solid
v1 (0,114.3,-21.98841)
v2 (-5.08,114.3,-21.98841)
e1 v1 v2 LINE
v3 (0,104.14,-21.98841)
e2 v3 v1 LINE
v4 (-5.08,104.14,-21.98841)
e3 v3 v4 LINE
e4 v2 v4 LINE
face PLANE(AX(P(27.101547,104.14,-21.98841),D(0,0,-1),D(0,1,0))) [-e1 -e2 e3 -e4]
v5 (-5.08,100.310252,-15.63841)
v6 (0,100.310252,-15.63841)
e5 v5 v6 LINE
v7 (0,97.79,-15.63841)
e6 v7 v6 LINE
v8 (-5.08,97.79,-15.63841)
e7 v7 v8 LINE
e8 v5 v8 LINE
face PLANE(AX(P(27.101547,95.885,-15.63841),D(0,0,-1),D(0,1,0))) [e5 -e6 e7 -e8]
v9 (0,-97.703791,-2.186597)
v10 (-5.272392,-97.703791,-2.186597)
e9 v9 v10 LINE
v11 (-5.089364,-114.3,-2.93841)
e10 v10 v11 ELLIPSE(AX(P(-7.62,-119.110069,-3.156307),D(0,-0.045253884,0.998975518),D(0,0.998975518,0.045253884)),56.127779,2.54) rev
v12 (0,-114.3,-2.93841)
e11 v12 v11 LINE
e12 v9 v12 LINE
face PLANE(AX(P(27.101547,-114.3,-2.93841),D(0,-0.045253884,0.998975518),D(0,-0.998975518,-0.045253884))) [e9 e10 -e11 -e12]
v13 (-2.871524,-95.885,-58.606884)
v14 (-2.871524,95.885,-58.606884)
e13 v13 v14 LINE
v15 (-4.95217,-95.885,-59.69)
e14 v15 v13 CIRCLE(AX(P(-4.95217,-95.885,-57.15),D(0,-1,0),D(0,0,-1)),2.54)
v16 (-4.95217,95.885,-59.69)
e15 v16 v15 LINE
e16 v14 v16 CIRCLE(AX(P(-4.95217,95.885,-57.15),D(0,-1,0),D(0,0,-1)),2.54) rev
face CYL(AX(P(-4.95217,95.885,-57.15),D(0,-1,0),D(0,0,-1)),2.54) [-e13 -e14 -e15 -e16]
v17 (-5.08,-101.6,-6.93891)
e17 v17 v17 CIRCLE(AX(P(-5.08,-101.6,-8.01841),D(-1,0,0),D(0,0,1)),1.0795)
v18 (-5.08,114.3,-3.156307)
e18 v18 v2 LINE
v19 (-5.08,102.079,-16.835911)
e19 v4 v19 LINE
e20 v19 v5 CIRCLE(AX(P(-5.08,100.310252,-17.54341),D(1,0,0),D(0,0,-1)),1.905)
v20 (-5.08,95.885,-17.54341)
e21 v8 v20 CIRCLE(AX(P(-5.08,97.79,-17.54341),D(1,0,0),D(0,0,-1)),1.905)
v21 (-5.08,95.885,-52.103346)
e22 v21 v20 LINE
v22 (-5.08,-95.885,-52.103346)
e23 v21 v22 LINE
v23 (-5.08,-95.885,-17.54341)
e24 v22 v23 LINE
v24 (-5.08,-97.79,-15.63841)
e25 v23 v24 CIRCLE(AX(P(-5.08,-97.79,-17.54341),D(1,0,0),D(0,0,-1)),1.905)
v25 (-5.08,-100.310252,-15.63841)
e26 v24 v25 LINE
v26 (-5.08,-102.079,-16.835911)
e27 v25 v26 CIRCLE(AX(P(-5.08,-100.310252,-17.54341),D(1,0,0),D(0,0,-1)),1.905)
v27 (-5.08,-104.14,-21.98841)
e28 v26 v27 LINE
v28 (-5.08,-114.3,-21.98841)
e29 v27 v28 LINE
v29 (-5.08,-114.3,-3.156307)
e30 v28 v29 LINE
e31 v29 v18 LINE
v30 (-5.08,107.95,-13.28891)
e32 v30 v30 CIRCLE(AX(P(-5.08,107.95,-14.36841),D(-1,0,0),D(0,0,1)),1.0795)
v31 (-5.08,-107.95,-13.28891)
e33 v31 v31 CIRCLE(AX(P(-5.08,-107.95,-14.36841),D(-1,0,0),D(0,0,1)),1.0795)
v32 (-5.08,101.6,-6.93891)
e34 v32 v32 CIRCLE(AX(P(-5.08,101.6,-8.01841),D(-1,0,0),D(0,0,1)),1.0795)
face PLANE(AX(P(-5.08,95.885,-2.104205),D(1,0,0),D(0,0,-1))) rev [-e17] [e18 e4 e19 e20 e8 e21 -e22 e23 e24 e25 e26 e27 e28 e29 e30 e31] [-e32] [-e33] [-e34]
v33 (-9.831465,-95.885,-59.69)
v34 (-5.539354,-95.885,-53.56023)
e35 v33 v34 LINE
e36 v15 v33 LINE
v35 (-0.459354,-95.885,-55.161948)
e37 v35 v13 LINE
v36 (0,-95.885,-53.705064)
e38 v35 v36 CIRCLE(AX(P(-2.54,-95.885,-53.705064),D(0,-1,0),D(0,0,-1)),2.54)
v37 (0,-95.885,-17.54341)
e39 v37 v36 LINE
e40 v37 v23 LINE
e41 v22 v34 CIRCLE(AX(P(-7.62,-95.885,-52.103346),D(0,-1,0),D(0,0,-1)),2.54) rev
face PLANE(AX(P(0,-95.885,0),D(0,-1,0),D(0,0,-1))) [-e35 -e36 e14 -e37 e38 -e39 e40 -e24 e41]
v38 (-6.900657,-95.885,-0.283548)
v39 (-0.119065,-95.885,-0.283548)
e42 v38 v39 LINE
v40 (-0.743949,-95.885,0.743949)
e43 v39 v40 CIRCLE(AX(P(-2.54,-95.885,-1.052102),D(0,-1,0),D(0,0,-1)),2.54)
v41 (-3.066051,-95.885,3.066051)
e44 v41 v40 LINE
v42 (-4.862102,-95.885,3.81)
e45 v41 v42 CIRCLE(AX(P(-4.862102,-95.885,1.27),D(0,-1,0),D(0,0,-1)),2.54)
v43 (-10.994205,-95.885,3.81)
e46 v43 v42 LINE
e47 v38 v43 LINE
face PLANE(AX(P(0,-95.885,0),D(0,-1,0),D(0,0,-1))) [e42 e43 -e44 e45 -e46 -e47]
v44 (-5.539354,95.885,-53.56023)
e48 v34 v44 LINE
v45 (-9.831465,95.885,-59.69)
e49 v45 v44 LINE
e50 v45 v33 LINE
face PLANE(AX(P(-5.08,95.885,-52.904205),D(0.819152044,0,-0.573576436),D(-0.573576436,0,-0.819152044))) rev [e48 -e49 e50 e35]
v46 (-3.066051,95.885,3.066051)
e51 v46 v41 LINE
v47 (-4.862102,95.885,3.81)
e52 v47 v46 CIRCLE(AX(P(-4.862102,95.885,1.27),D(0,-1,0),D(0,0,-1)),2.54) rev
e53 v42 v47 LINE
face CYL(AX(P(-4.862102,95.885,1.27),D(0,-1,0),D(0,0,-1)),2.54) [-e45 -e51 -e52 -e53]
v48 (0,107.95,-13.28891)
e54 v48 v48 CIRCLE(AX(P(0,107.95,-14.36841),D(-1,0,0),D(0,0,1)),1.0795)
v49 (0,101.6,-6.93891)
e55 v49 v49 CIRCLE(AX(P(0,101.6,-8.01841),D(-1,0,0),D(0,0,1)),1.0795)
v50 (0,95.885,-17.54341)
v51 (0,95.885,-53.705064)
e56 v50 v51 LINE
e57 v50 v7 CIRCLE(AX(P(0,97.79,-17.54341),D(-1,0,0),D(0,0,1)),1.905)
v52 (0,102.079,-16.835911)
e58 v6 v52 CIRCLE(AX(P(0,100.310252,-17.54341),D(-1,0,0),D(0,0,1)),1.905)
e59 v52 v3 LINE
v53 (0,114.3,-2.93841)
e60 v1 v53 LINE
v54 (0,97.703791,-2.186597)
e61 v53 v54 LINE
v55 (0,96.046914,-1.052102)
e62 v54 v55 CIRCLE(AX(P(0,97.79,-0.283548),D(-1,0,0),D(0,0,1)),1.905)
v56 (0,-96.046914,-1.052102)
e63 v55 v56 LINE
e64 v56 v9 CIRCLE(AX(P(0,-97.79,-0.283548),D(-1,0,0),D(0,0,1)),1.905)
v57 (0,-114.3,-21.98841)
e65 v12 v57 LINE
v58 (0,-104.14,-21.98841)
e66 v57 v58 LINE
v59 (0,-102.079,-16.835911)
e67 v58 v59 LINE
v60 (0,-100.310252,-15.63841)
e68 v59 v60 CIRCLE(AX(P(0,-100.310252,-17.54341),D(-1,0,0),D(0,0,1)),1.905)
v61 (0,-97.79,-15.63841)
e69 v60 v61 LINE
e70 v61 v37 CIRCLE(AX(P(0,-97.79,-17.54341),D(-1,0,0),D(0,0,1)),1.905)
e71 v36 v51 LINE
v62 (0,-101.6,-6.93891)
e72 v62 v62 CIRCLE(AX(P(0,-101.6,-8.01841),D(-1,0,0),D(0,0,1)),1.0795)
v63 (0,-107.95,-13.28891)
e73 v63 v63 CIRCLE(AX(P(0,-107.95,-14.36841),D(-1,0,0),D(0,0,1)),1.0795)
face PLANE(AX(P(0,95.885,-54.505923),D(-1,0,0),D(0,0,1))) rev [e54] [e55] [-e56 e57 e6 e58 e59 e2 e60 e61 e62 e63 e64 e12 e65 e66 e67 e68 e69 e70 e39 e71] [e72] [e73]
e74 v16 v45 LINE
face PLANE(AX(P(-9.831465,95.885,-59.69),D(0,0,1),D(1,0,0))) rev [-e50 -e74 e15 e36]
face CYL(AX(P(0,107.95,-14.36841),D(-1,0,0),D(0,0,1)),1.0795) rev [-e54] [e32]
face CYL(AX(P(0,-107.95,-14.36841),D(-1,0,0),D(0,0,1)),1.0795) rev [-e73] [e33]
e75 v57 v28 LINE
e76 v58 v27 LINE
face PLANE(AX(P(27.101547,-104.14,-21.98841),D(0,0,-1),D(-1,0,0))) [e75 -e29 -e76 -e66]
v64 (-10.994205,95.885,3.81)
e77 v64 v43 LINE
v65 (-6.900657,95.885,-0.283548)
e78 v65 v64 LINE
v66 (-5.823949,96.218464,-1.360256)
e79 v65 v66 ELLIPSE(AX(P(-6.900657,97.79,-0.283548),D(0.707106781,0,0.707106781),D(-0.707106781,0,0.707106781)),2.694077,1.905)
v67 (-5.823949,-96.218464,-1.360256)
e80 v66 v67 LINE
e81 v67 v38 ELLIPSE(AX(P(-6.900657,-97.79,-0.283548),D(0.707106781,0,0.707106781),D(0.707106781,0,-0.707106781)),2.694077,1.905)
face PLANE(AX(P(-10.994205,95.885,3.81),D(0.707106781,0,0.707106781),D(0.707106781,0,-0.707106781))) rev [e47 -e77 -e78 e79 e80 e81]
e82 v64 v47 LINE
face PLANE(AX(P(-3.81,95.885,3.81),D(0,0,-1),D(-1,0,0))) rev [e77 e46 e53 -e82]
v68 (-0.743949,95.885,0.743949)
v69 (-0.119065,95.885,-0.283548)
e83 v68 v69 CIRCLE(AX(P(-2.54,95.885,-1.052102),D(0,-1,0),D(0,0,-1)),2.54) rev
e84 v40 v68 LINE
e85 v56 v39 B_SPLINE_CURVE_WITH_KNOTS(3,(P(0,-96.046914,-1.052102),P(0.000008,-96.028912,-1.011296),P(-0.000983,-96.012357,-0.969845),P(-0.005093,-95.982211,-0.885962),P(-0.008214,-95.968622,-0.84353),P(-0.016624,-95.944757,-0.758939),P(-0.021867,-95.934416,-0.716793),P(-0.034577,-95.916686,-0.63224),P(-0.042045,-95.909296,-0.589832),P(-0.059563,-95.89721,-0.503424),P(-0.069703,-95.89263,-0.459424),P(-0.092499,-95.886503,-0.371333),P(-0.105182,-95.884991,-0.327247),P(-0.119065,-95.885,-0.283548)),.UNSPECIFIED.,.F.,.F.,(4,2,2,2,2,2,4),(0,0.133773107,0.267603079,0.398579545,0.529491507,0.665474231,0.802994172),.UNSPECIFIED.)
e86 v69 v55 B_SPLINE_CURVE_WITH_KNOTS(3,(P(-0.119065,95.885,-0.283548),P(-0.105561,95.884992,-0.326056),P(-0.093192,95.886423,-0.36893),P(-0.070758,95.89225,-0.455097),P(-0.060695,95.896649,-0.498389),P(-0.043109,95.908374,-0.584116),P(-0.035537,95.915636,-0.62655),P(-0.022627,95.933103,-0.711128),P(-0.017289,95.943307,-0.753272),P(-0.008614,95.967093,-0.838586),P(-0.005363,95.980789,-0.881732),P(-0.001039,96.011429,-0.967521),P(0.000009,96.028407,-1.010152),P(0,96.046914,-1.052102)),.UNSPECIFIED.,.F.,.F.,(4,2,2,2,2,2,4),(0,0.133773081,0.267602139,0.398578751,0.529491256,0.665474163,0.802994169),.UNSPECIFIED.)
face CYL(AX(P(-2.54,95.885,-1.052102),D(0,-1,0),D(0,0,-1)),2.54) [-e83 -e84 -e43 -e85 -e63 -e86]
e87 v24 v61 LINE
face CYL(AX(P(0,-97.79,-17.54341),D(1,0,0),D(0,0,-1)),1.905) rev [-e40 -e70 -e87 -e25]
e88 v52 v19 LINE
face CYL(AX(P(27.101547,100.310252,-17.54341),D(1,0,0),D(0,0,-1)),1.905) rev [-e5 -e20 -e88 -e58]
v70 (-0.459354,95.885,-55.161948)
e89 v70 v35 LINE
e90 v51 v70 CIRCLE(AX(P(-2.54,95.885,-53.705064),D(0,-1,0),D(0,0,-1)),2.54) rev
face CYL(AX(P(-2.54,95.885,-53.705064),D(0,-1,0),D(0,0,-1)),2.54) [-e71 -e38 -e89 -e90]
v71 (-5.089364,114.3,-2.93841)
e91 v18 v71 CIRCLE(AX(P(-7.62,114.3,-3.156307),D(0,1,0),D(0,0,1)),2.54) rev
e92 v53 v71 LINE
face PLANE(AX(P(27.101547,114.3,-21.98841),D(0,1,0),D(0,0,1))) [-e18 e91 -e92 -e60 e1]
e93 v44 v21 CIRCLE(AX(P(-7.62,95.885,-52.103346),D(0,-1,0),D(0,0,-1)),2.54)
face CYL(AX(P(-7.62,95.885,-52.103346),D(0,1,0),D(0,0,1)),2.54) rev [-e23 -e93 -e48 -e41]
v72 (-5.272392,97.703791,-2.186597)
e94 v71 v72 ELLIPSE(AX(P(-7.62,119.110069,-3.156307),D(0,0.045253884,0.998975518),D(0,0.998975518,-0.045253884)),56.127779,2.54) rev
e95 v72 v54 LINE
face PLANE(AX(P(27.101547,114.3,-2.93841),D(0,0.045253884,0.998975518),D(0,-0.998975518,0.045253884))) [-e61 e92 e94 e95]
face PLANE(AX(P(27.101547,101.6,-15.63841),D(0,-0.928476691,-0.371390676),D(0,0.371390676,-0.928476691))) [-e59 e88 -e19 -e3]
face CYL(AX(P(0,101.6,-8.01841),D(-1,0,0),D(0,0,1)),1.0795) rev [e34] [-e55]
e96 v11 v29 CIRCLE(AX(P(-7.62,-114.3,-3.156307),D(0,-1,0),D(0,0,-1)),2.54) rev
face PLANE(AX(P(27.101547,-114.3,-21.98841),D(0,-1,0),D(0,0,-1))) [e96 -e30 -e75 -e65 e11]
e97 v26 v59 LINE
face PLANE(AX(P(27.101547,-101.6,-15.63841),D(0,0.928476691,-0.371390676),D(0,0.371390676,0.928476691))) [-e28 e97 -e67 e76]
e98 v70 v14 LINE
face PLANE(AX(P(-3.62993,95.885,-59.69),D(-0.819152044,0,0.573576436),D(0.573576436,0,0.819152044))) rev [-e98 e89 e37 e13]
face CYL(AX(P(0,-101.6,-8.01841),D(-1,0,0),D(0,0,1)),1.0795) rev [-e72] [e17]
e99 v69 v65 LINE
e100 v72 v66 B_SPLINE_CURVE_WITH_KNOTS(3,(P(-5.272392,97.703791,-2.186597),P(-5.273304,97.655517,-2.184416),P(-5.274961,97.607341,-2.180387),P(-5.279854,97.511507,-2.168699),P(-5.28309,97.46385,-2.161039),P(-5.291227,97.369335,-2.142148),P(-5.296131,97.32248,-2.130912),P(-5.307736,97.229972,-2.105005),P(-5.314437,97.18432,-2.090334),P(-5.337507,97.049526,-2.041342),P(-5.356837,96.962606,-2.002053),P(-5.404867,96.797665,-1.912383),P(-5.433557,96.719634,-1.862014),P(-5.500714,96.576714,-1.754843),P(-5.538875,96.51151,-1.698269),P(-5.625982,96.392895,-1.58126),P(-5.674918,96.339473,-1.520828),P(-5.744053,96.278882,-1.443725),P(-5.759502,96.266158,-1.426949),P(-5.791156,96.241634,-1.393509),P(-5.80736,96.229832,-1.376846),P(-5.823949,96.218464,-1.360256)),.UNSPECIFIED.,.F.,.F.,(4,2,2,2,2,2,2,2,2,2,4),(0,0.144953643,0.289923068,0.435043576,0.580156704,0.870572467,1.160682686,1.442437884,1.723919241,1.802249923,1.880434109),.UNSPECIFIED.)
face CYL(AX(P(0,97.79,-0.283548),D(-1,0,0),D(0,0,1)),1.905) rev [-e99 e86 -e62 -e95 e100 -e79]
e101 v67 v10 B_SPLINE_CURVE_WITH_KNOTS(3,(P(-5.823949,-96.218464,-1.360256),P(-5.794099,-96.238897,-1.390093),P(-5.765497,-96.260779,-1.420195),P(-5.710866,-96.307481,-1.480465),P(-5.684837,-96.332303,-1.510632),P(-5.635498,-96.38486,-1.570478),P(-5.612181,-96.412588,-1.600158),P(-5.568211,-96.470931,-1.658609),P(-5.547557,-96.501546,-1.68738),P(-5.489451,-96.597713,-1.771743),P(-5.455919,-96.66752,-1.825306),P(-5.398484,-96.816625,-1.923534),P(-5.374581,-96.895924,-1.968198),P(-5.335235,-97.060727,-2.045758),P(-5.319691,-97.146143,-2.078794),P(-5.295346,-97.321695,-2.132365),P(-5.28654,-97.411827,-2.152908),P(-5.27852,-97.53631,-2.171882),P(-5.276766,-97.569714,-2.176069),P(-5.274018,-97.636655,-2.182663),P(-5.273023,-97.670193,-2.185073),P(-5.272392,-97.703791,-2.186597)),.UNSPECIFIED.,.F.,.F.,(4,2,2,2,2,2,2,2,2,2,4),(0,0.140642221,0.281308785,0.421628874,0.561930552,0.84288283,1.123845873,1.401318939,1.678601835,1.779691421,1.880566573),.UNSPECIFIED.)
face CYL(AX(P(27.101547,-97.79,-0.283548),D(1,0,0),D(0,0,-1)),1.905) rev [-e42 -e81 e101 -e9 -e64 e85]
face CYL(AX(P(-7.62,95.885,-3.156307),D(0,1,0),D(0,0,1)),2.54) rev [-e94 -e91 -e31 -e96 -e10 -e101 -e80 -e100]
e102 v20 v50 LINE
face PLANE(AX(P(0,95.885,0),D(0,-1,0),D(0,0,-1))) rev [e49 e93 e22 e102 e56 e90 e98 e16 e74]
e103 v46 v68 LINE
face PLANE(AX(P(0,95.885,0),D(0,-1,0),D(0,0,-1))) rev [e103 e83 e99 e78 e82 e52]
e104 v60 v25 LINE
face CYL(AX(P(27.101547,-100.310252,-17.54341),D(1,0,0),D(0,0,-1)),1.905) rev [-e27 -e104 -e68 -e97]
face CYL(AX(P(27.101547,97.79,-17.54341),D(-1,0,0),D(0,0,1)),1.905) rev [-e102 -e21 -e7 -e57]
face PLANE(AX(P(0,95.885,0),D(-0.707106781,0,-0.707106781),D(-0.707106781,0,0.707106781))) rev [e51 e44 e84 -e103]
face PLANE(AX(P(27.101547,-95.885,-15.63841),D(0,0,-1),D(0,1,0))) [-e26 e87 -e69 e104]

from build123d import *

# Parameters (mm, degrees)
BOSS_EXTRUDE1_DEPTH = 95.885
BOSS_EXTRUDE2_DEPTH = 5.08
SKETCH5_R           = 1.0795
CUT_EXTRUDE1_DEPTH  = 130.08277933
FILLET2_R           = 1.905
FILLET3_R           = 2.54


with BuildPart() as part:
    # Sketch2 → Boss-Extrude1 (new, symmetric)
    with BuildSketch(Plane(origin=(0, 0, 0), x_dir=(1, 0, 0), z_dir=(0, 1, 0))):
        Polygon((0, 0), (-3.81, -3.81), (-10.994204897, -3.81), (-5.08, 2.104204897), (-5.08, 52.904204897), (-9.831464884, 59.69), (-3.629929973, 59.69), (0, 54.505922744), align=None)
    extrude(amount=BOSS_EXTRUDE1_DEPTH, both=True)

    # Sketch3 → Boss-Extrude2 (add)
    with BuildSketch(Plane.ZY.offset(5.08)):
        Polygon((-15.638409794, -95.885), (-15.638409794, -101.6), (-21.988409794, -104.14), (-21.988409794, -114.3), (-2.938409794, -114.3), (-2.104204897, -95.885), align=None)
        Polygon((-15.638409794, 95.885), (-2.104204897, 95.885), (-2.938409794, 114.3), (-21.988409794, 114.3), (-21.988409794, 104.14), (-15.638409794, 101.6), align=None)
    extrude(amount=-BOSS_EXTRUDE2_DEPTH)

    # Sketch5 → Cut-Extrude1 (cut, through all)
    with BuildSketch(Plane.ZY.offset(5.08)):
        with Locations((-40.64, -107.95)):
            Circle(SKETCH5_R)
        with Locations((-46.99, -101.6)):
            Circle(SKETCH5_R)
        with Locations((-46.99, 101.6)):
            Circle(SKETCH5_R)
        with Locations((-40.64, 107.95)):
            Circle(SKETCH5_R)
        with Locations((-8.018409794, -101.6)):
            Circle(SKETCH5_R)
        with Locations((-14.368409794, -107.95)):
            Circle(SKETCH5_R)
        with Locations((-8.018409794, 101.6)):
            Circle(SKETCH5_R)
        with Locations((-14.368409794, 107.95)):
            Circle(SKETCH5_R)
    extrude(amount=-CUT_EXTRUDE1_DEPTH, mode=Mode.SUBTRACT)

    # Fillet2
    # the kernel refuses this fillet: 1.905 mm, written as the material it adds along each edge
    with BuildSketch(Plane(origin=(-5.08, -95.885, -15.638409794), x_dir=(0, 0, -1), z_dir=(1, 0, 0))) as fillet2_piece_1:
        with BuildLine():
            CenterArc((FILLET2_R, -FILLET2_R), FILLET2_R, 90, 90)
            Line((0, -FILLET2_R), (0, 0))
            Line((0, 0), (FILLET2_R, 0))
        make_face()
    extrude(amount=5.08)
    with BuildSketch(Plane(origin=(-5.08, -95.885, -2.104204897), x_dir=(0, 0, 1), z_dir=(1, 0, 0))) as fillet2_piece_2_section:
        with BuildLine():
            CenterArc((FILLET2_R * 0.955725239349, FILLET2_R), FILLET2_R, 182.593742353, 87.406257647)
            Line((-FILLET2_R * 0.0432502788724, FILLET2_R * 0.954746116256), (0, 0))
            Line((0, 0), (FILLET2_R * 0.955725239349, 0))
        make_face()
    fillet2_piece_2 = extrude(amount=5.08, mode=Mode.PRIVATE)
    fillet2_piece_2 = split(fillet2_piece_2, bisect_by=Plane(origin=(-5.032232027, -97.010068738, -2.15197287), z_dir=(-0.7071067811865467, 0, -0.7071067811865485)), keep=Keep.TOP, mode=Mode.PRIVATE)
    add(fillet2_piece_2)
    with BuildSketch(Plane(origin=(-9.631641452, -95.885, -2.104204897), x_dir=(0, 0, 1), z_dir=(1, 0, 0))) as fillet2_piece_3_section:
        with BuildLine():
            CenterArc((FILLET2_R * 0.955725239349, FILLET2_R), FILLET2_R, 182.593742353, 87.406257647)
            Line((-FILLET2_R * 0.0432502788724, FILLET2_R * 0.954746116256), (0, 0))
            Line((0, 0), (FILLET2_R * 0.955725239349, 0))
        make_face()
    fillet2_piece_3 = extrude(amount=9.631641452, mode=Mode.PRIVATE)
    fillet2_piece_3 = split(fillet2_piece_3, bisect_by=Plane(origin=(-5.677063574, -96.058379599, -1.507141323), z_dir=(0.7071067811865467, 0, 0.7071067811865485)), keep=Keep.TOP, mode=Mode.PRIVATE)
    fillet2_piece_3 = split(fillet2_piece_3, bisect_by=Plane(origin=(-5.08, -96.058379599, -1.308120132), z_dir=(-1, 0, 0)), keep=Keep.TOP, mode=Mode.PRIVATE)
    add(fillet2_piece_3)
    with BuildSketch(Plane(origin=(-5.08, -95.885, -2.104204897), x_dir=(0, 0, 1), z_dir=(1, 0, 0))) as fillet2_piece_4_section:
        with BuildLine():
            CenterArc((FILLET2_R * 0.955725239349, FILLET2_R), FILLET2_R, 182.593742353, 87.406257647)
            Line((-FILLET2_R * 0.0432502788724, FILLET2_R * 0.954746116256), (0, 0))
            Line((0, 0), (FILLET2_R * 0.955725239349, 0))
        make_face()
    fillet2_piece_4 = extrude(amount=5.08, mode=Mode.PRIVATE)
    fillet2_piece_4 = split(fillet2_piece_4, bisect_by=Plane(origin=(-4.004458977, -96.293780551, -3.17974592), z_dir=(0.7071067811865467, 0, 0.7071067811865485)), keep=Keep.TOP, mode=Mode.PRIVATE)
    add(fillet2_piece_4)
    with BuildSketch(Plane(origin=(-5.08, -101.6, -15.638409794), x_dir=(0, 1, 0), z_dir=(1, 0, 0))) as fillet2_piece_5:
        with BuildLine():
            CenterArc((FILLET2_R * 0.677032961427, -FILLET2_R), FILLET2_R, 90, 68.198590514)
            Line((-FILLET2_R * 0.251443729458, -FILLET2_R * 0.628609323646), (0, 0))
            Line((0, 0), (FILLET2_R * 0.677032961427, 0))
        make_face()
    extrude(amount=5.08)
    with BuildSketch(Plane(origin=(-5.08, 95.885, -15.638409794), x_dir=(0, 0, -1), z_dir=(1, 0, 0))) as fillet2_piece_6:
        with BuildLine():
            CenterArc((FILLET2_R, FILLET2_R), FILLET2_R, 180, 90)
            Line((0, FILLET2_R), (0, 0))
            Line((0, 0), (FILLET2_R, 0))
        make_face()
    extrude(amount=5.08)
    with BuildSketch(Plane(origin=(-5.08, 101.6, -15.638409794), x_dir=(0, -1, 0), z_dir=(1, 0, 0))) as fillet2_piece_7:
        with BuildLine():
            CenterArc((FILLET2_R * 0.677032961427, FILLET2_R), FILLET2_R, 201.801409486, 68.198590514)
            Line((-FILLET2_R * 0.251443729458, FILLET2_R * 0.628609323646), (0, 0))
            Line((0, 0), (FILLET2_R * 0.677032961427, 0))
        make_face()
    extrude(amount=5.08)
    with BuildSketch(Plane(origin=(-5.08, 95.885, -2.104204897), x_dir=(0, 0, 1), z_dir=(1, 0, 0))) as fillet2_piece_8_section:
        with BuildLine():
            CenterArc((FILLET2_R * 0.955725239349, -FILLET2_R), FILLET2_R, 90, 87.406257647)
            Line((-FILLET2_R * 0.0432502788724, -FILLET2_R * 0.954746116256), (0, 0))
            Line((0, 0), (FILLET2_R * 0.955725239349, 0))
        make_face()
    fillet2_piece_8 = extrude(amount=5.08, mode=Mode.PRIVATE)
    fillet2_piece_8 = split(fillet2_piece_8, bisect_by=Plane(origin=(-5.032232027, 97.010068738, -2.15197287), z_dir=(-0.7071067811865467, 0, -0.7071067811865485)), keep=Keep.TOP, mode=Mode.PRIVATE)
    add(fillet2_piece_8)
    with BuildSketch(Plane(origin=(-9.631641452, 95.885, -2.104204897), x_dir=(0, 0, 1), z_dir=(1, 0, 0))) as fillet2_piece_9_section:
        with BuildLine():
            CenterArc((FILLET2_R * 0.955725239349, -FILLET2_R), FILLET2_R, 90, 87.406257647)
            Line((-FILLET2_R * 0.0432502788724, -FILLET2_R * 0.954746116256), (0, 0))
            Line((0, 0), (FILLET2_R * 0.955725239349, 0))
        make_face()
    fillet2_piece_9 = extrude(amount=9.631641452, mode=Mode.PRIVATE)
    fillet2_piece_9 = split(fillet2_piece_9, bisect_by=Plane(origin=(-5.677063574, 96.058379599, -1.507141323), z_dir=(0.7071067811865467, 0, 0.7071067811865485)), keep=Keep.TOP, mode=Mode.PRIVATE)
    fillet2_piece_9 = split(fillet2_piece_9, bisect_by=Plane(origin=(-5.08, 96.058379599, -1.308120132), z_dir=(-1, 0, 0)), keep=Keep.TOP, mode=Mode.PRIVATE)
    add(fillet2_piece_9)
    with BuildSketch(Plane(origin=(-5.08, 95.885, -2.104204897), x_dir=(0, 0, 1), z_dir=(1, 0, 0))) as fillet2_piece_10_section:
        with BuildLine():
            CenterArc((FILLET2_R * 0.955725239349, -FILLET2_R), FILLET2_R, 90, 87.406257647)
            Line((-FILLET2_R * 0.0432502788724, -FILLET2_R * 0.954746116256), (0, 0))
            Line((0, 0), (FILLET2_R * 0.955725239349, 0))
        make_face()
    fillet2_piece_10 = extrude(amount=5.08, mode=Mode.PRIVATE)
    fillet2_piece_10 = split(fillet2_piece_10, bisect_by=Plane(origin=(-4.004458977, 96.293780551, -3.17974592), z_dir=(0.7071067811865467, 0, 0.7071067811865485)), keep=Keep.TOP, mode=Mode.PRIVATE)
    add(fillet2_piece_10)

    # Fillet3
    fillet3_edges = [part.edges().sort_by_distance(p)[0] for p in [
        (-3.629929973, 0, -59.69),
        (-3.81, 0, 3.81),
        (0, 0, -54.505922744),
        (0, 0, 0),
        (-5.08, 0, -52.904204897),
        (-5.08, 0, -2.104204897),
    ]]
    fillet(fillet3_edges, radius=FILLET3_R)


solid = part.part
